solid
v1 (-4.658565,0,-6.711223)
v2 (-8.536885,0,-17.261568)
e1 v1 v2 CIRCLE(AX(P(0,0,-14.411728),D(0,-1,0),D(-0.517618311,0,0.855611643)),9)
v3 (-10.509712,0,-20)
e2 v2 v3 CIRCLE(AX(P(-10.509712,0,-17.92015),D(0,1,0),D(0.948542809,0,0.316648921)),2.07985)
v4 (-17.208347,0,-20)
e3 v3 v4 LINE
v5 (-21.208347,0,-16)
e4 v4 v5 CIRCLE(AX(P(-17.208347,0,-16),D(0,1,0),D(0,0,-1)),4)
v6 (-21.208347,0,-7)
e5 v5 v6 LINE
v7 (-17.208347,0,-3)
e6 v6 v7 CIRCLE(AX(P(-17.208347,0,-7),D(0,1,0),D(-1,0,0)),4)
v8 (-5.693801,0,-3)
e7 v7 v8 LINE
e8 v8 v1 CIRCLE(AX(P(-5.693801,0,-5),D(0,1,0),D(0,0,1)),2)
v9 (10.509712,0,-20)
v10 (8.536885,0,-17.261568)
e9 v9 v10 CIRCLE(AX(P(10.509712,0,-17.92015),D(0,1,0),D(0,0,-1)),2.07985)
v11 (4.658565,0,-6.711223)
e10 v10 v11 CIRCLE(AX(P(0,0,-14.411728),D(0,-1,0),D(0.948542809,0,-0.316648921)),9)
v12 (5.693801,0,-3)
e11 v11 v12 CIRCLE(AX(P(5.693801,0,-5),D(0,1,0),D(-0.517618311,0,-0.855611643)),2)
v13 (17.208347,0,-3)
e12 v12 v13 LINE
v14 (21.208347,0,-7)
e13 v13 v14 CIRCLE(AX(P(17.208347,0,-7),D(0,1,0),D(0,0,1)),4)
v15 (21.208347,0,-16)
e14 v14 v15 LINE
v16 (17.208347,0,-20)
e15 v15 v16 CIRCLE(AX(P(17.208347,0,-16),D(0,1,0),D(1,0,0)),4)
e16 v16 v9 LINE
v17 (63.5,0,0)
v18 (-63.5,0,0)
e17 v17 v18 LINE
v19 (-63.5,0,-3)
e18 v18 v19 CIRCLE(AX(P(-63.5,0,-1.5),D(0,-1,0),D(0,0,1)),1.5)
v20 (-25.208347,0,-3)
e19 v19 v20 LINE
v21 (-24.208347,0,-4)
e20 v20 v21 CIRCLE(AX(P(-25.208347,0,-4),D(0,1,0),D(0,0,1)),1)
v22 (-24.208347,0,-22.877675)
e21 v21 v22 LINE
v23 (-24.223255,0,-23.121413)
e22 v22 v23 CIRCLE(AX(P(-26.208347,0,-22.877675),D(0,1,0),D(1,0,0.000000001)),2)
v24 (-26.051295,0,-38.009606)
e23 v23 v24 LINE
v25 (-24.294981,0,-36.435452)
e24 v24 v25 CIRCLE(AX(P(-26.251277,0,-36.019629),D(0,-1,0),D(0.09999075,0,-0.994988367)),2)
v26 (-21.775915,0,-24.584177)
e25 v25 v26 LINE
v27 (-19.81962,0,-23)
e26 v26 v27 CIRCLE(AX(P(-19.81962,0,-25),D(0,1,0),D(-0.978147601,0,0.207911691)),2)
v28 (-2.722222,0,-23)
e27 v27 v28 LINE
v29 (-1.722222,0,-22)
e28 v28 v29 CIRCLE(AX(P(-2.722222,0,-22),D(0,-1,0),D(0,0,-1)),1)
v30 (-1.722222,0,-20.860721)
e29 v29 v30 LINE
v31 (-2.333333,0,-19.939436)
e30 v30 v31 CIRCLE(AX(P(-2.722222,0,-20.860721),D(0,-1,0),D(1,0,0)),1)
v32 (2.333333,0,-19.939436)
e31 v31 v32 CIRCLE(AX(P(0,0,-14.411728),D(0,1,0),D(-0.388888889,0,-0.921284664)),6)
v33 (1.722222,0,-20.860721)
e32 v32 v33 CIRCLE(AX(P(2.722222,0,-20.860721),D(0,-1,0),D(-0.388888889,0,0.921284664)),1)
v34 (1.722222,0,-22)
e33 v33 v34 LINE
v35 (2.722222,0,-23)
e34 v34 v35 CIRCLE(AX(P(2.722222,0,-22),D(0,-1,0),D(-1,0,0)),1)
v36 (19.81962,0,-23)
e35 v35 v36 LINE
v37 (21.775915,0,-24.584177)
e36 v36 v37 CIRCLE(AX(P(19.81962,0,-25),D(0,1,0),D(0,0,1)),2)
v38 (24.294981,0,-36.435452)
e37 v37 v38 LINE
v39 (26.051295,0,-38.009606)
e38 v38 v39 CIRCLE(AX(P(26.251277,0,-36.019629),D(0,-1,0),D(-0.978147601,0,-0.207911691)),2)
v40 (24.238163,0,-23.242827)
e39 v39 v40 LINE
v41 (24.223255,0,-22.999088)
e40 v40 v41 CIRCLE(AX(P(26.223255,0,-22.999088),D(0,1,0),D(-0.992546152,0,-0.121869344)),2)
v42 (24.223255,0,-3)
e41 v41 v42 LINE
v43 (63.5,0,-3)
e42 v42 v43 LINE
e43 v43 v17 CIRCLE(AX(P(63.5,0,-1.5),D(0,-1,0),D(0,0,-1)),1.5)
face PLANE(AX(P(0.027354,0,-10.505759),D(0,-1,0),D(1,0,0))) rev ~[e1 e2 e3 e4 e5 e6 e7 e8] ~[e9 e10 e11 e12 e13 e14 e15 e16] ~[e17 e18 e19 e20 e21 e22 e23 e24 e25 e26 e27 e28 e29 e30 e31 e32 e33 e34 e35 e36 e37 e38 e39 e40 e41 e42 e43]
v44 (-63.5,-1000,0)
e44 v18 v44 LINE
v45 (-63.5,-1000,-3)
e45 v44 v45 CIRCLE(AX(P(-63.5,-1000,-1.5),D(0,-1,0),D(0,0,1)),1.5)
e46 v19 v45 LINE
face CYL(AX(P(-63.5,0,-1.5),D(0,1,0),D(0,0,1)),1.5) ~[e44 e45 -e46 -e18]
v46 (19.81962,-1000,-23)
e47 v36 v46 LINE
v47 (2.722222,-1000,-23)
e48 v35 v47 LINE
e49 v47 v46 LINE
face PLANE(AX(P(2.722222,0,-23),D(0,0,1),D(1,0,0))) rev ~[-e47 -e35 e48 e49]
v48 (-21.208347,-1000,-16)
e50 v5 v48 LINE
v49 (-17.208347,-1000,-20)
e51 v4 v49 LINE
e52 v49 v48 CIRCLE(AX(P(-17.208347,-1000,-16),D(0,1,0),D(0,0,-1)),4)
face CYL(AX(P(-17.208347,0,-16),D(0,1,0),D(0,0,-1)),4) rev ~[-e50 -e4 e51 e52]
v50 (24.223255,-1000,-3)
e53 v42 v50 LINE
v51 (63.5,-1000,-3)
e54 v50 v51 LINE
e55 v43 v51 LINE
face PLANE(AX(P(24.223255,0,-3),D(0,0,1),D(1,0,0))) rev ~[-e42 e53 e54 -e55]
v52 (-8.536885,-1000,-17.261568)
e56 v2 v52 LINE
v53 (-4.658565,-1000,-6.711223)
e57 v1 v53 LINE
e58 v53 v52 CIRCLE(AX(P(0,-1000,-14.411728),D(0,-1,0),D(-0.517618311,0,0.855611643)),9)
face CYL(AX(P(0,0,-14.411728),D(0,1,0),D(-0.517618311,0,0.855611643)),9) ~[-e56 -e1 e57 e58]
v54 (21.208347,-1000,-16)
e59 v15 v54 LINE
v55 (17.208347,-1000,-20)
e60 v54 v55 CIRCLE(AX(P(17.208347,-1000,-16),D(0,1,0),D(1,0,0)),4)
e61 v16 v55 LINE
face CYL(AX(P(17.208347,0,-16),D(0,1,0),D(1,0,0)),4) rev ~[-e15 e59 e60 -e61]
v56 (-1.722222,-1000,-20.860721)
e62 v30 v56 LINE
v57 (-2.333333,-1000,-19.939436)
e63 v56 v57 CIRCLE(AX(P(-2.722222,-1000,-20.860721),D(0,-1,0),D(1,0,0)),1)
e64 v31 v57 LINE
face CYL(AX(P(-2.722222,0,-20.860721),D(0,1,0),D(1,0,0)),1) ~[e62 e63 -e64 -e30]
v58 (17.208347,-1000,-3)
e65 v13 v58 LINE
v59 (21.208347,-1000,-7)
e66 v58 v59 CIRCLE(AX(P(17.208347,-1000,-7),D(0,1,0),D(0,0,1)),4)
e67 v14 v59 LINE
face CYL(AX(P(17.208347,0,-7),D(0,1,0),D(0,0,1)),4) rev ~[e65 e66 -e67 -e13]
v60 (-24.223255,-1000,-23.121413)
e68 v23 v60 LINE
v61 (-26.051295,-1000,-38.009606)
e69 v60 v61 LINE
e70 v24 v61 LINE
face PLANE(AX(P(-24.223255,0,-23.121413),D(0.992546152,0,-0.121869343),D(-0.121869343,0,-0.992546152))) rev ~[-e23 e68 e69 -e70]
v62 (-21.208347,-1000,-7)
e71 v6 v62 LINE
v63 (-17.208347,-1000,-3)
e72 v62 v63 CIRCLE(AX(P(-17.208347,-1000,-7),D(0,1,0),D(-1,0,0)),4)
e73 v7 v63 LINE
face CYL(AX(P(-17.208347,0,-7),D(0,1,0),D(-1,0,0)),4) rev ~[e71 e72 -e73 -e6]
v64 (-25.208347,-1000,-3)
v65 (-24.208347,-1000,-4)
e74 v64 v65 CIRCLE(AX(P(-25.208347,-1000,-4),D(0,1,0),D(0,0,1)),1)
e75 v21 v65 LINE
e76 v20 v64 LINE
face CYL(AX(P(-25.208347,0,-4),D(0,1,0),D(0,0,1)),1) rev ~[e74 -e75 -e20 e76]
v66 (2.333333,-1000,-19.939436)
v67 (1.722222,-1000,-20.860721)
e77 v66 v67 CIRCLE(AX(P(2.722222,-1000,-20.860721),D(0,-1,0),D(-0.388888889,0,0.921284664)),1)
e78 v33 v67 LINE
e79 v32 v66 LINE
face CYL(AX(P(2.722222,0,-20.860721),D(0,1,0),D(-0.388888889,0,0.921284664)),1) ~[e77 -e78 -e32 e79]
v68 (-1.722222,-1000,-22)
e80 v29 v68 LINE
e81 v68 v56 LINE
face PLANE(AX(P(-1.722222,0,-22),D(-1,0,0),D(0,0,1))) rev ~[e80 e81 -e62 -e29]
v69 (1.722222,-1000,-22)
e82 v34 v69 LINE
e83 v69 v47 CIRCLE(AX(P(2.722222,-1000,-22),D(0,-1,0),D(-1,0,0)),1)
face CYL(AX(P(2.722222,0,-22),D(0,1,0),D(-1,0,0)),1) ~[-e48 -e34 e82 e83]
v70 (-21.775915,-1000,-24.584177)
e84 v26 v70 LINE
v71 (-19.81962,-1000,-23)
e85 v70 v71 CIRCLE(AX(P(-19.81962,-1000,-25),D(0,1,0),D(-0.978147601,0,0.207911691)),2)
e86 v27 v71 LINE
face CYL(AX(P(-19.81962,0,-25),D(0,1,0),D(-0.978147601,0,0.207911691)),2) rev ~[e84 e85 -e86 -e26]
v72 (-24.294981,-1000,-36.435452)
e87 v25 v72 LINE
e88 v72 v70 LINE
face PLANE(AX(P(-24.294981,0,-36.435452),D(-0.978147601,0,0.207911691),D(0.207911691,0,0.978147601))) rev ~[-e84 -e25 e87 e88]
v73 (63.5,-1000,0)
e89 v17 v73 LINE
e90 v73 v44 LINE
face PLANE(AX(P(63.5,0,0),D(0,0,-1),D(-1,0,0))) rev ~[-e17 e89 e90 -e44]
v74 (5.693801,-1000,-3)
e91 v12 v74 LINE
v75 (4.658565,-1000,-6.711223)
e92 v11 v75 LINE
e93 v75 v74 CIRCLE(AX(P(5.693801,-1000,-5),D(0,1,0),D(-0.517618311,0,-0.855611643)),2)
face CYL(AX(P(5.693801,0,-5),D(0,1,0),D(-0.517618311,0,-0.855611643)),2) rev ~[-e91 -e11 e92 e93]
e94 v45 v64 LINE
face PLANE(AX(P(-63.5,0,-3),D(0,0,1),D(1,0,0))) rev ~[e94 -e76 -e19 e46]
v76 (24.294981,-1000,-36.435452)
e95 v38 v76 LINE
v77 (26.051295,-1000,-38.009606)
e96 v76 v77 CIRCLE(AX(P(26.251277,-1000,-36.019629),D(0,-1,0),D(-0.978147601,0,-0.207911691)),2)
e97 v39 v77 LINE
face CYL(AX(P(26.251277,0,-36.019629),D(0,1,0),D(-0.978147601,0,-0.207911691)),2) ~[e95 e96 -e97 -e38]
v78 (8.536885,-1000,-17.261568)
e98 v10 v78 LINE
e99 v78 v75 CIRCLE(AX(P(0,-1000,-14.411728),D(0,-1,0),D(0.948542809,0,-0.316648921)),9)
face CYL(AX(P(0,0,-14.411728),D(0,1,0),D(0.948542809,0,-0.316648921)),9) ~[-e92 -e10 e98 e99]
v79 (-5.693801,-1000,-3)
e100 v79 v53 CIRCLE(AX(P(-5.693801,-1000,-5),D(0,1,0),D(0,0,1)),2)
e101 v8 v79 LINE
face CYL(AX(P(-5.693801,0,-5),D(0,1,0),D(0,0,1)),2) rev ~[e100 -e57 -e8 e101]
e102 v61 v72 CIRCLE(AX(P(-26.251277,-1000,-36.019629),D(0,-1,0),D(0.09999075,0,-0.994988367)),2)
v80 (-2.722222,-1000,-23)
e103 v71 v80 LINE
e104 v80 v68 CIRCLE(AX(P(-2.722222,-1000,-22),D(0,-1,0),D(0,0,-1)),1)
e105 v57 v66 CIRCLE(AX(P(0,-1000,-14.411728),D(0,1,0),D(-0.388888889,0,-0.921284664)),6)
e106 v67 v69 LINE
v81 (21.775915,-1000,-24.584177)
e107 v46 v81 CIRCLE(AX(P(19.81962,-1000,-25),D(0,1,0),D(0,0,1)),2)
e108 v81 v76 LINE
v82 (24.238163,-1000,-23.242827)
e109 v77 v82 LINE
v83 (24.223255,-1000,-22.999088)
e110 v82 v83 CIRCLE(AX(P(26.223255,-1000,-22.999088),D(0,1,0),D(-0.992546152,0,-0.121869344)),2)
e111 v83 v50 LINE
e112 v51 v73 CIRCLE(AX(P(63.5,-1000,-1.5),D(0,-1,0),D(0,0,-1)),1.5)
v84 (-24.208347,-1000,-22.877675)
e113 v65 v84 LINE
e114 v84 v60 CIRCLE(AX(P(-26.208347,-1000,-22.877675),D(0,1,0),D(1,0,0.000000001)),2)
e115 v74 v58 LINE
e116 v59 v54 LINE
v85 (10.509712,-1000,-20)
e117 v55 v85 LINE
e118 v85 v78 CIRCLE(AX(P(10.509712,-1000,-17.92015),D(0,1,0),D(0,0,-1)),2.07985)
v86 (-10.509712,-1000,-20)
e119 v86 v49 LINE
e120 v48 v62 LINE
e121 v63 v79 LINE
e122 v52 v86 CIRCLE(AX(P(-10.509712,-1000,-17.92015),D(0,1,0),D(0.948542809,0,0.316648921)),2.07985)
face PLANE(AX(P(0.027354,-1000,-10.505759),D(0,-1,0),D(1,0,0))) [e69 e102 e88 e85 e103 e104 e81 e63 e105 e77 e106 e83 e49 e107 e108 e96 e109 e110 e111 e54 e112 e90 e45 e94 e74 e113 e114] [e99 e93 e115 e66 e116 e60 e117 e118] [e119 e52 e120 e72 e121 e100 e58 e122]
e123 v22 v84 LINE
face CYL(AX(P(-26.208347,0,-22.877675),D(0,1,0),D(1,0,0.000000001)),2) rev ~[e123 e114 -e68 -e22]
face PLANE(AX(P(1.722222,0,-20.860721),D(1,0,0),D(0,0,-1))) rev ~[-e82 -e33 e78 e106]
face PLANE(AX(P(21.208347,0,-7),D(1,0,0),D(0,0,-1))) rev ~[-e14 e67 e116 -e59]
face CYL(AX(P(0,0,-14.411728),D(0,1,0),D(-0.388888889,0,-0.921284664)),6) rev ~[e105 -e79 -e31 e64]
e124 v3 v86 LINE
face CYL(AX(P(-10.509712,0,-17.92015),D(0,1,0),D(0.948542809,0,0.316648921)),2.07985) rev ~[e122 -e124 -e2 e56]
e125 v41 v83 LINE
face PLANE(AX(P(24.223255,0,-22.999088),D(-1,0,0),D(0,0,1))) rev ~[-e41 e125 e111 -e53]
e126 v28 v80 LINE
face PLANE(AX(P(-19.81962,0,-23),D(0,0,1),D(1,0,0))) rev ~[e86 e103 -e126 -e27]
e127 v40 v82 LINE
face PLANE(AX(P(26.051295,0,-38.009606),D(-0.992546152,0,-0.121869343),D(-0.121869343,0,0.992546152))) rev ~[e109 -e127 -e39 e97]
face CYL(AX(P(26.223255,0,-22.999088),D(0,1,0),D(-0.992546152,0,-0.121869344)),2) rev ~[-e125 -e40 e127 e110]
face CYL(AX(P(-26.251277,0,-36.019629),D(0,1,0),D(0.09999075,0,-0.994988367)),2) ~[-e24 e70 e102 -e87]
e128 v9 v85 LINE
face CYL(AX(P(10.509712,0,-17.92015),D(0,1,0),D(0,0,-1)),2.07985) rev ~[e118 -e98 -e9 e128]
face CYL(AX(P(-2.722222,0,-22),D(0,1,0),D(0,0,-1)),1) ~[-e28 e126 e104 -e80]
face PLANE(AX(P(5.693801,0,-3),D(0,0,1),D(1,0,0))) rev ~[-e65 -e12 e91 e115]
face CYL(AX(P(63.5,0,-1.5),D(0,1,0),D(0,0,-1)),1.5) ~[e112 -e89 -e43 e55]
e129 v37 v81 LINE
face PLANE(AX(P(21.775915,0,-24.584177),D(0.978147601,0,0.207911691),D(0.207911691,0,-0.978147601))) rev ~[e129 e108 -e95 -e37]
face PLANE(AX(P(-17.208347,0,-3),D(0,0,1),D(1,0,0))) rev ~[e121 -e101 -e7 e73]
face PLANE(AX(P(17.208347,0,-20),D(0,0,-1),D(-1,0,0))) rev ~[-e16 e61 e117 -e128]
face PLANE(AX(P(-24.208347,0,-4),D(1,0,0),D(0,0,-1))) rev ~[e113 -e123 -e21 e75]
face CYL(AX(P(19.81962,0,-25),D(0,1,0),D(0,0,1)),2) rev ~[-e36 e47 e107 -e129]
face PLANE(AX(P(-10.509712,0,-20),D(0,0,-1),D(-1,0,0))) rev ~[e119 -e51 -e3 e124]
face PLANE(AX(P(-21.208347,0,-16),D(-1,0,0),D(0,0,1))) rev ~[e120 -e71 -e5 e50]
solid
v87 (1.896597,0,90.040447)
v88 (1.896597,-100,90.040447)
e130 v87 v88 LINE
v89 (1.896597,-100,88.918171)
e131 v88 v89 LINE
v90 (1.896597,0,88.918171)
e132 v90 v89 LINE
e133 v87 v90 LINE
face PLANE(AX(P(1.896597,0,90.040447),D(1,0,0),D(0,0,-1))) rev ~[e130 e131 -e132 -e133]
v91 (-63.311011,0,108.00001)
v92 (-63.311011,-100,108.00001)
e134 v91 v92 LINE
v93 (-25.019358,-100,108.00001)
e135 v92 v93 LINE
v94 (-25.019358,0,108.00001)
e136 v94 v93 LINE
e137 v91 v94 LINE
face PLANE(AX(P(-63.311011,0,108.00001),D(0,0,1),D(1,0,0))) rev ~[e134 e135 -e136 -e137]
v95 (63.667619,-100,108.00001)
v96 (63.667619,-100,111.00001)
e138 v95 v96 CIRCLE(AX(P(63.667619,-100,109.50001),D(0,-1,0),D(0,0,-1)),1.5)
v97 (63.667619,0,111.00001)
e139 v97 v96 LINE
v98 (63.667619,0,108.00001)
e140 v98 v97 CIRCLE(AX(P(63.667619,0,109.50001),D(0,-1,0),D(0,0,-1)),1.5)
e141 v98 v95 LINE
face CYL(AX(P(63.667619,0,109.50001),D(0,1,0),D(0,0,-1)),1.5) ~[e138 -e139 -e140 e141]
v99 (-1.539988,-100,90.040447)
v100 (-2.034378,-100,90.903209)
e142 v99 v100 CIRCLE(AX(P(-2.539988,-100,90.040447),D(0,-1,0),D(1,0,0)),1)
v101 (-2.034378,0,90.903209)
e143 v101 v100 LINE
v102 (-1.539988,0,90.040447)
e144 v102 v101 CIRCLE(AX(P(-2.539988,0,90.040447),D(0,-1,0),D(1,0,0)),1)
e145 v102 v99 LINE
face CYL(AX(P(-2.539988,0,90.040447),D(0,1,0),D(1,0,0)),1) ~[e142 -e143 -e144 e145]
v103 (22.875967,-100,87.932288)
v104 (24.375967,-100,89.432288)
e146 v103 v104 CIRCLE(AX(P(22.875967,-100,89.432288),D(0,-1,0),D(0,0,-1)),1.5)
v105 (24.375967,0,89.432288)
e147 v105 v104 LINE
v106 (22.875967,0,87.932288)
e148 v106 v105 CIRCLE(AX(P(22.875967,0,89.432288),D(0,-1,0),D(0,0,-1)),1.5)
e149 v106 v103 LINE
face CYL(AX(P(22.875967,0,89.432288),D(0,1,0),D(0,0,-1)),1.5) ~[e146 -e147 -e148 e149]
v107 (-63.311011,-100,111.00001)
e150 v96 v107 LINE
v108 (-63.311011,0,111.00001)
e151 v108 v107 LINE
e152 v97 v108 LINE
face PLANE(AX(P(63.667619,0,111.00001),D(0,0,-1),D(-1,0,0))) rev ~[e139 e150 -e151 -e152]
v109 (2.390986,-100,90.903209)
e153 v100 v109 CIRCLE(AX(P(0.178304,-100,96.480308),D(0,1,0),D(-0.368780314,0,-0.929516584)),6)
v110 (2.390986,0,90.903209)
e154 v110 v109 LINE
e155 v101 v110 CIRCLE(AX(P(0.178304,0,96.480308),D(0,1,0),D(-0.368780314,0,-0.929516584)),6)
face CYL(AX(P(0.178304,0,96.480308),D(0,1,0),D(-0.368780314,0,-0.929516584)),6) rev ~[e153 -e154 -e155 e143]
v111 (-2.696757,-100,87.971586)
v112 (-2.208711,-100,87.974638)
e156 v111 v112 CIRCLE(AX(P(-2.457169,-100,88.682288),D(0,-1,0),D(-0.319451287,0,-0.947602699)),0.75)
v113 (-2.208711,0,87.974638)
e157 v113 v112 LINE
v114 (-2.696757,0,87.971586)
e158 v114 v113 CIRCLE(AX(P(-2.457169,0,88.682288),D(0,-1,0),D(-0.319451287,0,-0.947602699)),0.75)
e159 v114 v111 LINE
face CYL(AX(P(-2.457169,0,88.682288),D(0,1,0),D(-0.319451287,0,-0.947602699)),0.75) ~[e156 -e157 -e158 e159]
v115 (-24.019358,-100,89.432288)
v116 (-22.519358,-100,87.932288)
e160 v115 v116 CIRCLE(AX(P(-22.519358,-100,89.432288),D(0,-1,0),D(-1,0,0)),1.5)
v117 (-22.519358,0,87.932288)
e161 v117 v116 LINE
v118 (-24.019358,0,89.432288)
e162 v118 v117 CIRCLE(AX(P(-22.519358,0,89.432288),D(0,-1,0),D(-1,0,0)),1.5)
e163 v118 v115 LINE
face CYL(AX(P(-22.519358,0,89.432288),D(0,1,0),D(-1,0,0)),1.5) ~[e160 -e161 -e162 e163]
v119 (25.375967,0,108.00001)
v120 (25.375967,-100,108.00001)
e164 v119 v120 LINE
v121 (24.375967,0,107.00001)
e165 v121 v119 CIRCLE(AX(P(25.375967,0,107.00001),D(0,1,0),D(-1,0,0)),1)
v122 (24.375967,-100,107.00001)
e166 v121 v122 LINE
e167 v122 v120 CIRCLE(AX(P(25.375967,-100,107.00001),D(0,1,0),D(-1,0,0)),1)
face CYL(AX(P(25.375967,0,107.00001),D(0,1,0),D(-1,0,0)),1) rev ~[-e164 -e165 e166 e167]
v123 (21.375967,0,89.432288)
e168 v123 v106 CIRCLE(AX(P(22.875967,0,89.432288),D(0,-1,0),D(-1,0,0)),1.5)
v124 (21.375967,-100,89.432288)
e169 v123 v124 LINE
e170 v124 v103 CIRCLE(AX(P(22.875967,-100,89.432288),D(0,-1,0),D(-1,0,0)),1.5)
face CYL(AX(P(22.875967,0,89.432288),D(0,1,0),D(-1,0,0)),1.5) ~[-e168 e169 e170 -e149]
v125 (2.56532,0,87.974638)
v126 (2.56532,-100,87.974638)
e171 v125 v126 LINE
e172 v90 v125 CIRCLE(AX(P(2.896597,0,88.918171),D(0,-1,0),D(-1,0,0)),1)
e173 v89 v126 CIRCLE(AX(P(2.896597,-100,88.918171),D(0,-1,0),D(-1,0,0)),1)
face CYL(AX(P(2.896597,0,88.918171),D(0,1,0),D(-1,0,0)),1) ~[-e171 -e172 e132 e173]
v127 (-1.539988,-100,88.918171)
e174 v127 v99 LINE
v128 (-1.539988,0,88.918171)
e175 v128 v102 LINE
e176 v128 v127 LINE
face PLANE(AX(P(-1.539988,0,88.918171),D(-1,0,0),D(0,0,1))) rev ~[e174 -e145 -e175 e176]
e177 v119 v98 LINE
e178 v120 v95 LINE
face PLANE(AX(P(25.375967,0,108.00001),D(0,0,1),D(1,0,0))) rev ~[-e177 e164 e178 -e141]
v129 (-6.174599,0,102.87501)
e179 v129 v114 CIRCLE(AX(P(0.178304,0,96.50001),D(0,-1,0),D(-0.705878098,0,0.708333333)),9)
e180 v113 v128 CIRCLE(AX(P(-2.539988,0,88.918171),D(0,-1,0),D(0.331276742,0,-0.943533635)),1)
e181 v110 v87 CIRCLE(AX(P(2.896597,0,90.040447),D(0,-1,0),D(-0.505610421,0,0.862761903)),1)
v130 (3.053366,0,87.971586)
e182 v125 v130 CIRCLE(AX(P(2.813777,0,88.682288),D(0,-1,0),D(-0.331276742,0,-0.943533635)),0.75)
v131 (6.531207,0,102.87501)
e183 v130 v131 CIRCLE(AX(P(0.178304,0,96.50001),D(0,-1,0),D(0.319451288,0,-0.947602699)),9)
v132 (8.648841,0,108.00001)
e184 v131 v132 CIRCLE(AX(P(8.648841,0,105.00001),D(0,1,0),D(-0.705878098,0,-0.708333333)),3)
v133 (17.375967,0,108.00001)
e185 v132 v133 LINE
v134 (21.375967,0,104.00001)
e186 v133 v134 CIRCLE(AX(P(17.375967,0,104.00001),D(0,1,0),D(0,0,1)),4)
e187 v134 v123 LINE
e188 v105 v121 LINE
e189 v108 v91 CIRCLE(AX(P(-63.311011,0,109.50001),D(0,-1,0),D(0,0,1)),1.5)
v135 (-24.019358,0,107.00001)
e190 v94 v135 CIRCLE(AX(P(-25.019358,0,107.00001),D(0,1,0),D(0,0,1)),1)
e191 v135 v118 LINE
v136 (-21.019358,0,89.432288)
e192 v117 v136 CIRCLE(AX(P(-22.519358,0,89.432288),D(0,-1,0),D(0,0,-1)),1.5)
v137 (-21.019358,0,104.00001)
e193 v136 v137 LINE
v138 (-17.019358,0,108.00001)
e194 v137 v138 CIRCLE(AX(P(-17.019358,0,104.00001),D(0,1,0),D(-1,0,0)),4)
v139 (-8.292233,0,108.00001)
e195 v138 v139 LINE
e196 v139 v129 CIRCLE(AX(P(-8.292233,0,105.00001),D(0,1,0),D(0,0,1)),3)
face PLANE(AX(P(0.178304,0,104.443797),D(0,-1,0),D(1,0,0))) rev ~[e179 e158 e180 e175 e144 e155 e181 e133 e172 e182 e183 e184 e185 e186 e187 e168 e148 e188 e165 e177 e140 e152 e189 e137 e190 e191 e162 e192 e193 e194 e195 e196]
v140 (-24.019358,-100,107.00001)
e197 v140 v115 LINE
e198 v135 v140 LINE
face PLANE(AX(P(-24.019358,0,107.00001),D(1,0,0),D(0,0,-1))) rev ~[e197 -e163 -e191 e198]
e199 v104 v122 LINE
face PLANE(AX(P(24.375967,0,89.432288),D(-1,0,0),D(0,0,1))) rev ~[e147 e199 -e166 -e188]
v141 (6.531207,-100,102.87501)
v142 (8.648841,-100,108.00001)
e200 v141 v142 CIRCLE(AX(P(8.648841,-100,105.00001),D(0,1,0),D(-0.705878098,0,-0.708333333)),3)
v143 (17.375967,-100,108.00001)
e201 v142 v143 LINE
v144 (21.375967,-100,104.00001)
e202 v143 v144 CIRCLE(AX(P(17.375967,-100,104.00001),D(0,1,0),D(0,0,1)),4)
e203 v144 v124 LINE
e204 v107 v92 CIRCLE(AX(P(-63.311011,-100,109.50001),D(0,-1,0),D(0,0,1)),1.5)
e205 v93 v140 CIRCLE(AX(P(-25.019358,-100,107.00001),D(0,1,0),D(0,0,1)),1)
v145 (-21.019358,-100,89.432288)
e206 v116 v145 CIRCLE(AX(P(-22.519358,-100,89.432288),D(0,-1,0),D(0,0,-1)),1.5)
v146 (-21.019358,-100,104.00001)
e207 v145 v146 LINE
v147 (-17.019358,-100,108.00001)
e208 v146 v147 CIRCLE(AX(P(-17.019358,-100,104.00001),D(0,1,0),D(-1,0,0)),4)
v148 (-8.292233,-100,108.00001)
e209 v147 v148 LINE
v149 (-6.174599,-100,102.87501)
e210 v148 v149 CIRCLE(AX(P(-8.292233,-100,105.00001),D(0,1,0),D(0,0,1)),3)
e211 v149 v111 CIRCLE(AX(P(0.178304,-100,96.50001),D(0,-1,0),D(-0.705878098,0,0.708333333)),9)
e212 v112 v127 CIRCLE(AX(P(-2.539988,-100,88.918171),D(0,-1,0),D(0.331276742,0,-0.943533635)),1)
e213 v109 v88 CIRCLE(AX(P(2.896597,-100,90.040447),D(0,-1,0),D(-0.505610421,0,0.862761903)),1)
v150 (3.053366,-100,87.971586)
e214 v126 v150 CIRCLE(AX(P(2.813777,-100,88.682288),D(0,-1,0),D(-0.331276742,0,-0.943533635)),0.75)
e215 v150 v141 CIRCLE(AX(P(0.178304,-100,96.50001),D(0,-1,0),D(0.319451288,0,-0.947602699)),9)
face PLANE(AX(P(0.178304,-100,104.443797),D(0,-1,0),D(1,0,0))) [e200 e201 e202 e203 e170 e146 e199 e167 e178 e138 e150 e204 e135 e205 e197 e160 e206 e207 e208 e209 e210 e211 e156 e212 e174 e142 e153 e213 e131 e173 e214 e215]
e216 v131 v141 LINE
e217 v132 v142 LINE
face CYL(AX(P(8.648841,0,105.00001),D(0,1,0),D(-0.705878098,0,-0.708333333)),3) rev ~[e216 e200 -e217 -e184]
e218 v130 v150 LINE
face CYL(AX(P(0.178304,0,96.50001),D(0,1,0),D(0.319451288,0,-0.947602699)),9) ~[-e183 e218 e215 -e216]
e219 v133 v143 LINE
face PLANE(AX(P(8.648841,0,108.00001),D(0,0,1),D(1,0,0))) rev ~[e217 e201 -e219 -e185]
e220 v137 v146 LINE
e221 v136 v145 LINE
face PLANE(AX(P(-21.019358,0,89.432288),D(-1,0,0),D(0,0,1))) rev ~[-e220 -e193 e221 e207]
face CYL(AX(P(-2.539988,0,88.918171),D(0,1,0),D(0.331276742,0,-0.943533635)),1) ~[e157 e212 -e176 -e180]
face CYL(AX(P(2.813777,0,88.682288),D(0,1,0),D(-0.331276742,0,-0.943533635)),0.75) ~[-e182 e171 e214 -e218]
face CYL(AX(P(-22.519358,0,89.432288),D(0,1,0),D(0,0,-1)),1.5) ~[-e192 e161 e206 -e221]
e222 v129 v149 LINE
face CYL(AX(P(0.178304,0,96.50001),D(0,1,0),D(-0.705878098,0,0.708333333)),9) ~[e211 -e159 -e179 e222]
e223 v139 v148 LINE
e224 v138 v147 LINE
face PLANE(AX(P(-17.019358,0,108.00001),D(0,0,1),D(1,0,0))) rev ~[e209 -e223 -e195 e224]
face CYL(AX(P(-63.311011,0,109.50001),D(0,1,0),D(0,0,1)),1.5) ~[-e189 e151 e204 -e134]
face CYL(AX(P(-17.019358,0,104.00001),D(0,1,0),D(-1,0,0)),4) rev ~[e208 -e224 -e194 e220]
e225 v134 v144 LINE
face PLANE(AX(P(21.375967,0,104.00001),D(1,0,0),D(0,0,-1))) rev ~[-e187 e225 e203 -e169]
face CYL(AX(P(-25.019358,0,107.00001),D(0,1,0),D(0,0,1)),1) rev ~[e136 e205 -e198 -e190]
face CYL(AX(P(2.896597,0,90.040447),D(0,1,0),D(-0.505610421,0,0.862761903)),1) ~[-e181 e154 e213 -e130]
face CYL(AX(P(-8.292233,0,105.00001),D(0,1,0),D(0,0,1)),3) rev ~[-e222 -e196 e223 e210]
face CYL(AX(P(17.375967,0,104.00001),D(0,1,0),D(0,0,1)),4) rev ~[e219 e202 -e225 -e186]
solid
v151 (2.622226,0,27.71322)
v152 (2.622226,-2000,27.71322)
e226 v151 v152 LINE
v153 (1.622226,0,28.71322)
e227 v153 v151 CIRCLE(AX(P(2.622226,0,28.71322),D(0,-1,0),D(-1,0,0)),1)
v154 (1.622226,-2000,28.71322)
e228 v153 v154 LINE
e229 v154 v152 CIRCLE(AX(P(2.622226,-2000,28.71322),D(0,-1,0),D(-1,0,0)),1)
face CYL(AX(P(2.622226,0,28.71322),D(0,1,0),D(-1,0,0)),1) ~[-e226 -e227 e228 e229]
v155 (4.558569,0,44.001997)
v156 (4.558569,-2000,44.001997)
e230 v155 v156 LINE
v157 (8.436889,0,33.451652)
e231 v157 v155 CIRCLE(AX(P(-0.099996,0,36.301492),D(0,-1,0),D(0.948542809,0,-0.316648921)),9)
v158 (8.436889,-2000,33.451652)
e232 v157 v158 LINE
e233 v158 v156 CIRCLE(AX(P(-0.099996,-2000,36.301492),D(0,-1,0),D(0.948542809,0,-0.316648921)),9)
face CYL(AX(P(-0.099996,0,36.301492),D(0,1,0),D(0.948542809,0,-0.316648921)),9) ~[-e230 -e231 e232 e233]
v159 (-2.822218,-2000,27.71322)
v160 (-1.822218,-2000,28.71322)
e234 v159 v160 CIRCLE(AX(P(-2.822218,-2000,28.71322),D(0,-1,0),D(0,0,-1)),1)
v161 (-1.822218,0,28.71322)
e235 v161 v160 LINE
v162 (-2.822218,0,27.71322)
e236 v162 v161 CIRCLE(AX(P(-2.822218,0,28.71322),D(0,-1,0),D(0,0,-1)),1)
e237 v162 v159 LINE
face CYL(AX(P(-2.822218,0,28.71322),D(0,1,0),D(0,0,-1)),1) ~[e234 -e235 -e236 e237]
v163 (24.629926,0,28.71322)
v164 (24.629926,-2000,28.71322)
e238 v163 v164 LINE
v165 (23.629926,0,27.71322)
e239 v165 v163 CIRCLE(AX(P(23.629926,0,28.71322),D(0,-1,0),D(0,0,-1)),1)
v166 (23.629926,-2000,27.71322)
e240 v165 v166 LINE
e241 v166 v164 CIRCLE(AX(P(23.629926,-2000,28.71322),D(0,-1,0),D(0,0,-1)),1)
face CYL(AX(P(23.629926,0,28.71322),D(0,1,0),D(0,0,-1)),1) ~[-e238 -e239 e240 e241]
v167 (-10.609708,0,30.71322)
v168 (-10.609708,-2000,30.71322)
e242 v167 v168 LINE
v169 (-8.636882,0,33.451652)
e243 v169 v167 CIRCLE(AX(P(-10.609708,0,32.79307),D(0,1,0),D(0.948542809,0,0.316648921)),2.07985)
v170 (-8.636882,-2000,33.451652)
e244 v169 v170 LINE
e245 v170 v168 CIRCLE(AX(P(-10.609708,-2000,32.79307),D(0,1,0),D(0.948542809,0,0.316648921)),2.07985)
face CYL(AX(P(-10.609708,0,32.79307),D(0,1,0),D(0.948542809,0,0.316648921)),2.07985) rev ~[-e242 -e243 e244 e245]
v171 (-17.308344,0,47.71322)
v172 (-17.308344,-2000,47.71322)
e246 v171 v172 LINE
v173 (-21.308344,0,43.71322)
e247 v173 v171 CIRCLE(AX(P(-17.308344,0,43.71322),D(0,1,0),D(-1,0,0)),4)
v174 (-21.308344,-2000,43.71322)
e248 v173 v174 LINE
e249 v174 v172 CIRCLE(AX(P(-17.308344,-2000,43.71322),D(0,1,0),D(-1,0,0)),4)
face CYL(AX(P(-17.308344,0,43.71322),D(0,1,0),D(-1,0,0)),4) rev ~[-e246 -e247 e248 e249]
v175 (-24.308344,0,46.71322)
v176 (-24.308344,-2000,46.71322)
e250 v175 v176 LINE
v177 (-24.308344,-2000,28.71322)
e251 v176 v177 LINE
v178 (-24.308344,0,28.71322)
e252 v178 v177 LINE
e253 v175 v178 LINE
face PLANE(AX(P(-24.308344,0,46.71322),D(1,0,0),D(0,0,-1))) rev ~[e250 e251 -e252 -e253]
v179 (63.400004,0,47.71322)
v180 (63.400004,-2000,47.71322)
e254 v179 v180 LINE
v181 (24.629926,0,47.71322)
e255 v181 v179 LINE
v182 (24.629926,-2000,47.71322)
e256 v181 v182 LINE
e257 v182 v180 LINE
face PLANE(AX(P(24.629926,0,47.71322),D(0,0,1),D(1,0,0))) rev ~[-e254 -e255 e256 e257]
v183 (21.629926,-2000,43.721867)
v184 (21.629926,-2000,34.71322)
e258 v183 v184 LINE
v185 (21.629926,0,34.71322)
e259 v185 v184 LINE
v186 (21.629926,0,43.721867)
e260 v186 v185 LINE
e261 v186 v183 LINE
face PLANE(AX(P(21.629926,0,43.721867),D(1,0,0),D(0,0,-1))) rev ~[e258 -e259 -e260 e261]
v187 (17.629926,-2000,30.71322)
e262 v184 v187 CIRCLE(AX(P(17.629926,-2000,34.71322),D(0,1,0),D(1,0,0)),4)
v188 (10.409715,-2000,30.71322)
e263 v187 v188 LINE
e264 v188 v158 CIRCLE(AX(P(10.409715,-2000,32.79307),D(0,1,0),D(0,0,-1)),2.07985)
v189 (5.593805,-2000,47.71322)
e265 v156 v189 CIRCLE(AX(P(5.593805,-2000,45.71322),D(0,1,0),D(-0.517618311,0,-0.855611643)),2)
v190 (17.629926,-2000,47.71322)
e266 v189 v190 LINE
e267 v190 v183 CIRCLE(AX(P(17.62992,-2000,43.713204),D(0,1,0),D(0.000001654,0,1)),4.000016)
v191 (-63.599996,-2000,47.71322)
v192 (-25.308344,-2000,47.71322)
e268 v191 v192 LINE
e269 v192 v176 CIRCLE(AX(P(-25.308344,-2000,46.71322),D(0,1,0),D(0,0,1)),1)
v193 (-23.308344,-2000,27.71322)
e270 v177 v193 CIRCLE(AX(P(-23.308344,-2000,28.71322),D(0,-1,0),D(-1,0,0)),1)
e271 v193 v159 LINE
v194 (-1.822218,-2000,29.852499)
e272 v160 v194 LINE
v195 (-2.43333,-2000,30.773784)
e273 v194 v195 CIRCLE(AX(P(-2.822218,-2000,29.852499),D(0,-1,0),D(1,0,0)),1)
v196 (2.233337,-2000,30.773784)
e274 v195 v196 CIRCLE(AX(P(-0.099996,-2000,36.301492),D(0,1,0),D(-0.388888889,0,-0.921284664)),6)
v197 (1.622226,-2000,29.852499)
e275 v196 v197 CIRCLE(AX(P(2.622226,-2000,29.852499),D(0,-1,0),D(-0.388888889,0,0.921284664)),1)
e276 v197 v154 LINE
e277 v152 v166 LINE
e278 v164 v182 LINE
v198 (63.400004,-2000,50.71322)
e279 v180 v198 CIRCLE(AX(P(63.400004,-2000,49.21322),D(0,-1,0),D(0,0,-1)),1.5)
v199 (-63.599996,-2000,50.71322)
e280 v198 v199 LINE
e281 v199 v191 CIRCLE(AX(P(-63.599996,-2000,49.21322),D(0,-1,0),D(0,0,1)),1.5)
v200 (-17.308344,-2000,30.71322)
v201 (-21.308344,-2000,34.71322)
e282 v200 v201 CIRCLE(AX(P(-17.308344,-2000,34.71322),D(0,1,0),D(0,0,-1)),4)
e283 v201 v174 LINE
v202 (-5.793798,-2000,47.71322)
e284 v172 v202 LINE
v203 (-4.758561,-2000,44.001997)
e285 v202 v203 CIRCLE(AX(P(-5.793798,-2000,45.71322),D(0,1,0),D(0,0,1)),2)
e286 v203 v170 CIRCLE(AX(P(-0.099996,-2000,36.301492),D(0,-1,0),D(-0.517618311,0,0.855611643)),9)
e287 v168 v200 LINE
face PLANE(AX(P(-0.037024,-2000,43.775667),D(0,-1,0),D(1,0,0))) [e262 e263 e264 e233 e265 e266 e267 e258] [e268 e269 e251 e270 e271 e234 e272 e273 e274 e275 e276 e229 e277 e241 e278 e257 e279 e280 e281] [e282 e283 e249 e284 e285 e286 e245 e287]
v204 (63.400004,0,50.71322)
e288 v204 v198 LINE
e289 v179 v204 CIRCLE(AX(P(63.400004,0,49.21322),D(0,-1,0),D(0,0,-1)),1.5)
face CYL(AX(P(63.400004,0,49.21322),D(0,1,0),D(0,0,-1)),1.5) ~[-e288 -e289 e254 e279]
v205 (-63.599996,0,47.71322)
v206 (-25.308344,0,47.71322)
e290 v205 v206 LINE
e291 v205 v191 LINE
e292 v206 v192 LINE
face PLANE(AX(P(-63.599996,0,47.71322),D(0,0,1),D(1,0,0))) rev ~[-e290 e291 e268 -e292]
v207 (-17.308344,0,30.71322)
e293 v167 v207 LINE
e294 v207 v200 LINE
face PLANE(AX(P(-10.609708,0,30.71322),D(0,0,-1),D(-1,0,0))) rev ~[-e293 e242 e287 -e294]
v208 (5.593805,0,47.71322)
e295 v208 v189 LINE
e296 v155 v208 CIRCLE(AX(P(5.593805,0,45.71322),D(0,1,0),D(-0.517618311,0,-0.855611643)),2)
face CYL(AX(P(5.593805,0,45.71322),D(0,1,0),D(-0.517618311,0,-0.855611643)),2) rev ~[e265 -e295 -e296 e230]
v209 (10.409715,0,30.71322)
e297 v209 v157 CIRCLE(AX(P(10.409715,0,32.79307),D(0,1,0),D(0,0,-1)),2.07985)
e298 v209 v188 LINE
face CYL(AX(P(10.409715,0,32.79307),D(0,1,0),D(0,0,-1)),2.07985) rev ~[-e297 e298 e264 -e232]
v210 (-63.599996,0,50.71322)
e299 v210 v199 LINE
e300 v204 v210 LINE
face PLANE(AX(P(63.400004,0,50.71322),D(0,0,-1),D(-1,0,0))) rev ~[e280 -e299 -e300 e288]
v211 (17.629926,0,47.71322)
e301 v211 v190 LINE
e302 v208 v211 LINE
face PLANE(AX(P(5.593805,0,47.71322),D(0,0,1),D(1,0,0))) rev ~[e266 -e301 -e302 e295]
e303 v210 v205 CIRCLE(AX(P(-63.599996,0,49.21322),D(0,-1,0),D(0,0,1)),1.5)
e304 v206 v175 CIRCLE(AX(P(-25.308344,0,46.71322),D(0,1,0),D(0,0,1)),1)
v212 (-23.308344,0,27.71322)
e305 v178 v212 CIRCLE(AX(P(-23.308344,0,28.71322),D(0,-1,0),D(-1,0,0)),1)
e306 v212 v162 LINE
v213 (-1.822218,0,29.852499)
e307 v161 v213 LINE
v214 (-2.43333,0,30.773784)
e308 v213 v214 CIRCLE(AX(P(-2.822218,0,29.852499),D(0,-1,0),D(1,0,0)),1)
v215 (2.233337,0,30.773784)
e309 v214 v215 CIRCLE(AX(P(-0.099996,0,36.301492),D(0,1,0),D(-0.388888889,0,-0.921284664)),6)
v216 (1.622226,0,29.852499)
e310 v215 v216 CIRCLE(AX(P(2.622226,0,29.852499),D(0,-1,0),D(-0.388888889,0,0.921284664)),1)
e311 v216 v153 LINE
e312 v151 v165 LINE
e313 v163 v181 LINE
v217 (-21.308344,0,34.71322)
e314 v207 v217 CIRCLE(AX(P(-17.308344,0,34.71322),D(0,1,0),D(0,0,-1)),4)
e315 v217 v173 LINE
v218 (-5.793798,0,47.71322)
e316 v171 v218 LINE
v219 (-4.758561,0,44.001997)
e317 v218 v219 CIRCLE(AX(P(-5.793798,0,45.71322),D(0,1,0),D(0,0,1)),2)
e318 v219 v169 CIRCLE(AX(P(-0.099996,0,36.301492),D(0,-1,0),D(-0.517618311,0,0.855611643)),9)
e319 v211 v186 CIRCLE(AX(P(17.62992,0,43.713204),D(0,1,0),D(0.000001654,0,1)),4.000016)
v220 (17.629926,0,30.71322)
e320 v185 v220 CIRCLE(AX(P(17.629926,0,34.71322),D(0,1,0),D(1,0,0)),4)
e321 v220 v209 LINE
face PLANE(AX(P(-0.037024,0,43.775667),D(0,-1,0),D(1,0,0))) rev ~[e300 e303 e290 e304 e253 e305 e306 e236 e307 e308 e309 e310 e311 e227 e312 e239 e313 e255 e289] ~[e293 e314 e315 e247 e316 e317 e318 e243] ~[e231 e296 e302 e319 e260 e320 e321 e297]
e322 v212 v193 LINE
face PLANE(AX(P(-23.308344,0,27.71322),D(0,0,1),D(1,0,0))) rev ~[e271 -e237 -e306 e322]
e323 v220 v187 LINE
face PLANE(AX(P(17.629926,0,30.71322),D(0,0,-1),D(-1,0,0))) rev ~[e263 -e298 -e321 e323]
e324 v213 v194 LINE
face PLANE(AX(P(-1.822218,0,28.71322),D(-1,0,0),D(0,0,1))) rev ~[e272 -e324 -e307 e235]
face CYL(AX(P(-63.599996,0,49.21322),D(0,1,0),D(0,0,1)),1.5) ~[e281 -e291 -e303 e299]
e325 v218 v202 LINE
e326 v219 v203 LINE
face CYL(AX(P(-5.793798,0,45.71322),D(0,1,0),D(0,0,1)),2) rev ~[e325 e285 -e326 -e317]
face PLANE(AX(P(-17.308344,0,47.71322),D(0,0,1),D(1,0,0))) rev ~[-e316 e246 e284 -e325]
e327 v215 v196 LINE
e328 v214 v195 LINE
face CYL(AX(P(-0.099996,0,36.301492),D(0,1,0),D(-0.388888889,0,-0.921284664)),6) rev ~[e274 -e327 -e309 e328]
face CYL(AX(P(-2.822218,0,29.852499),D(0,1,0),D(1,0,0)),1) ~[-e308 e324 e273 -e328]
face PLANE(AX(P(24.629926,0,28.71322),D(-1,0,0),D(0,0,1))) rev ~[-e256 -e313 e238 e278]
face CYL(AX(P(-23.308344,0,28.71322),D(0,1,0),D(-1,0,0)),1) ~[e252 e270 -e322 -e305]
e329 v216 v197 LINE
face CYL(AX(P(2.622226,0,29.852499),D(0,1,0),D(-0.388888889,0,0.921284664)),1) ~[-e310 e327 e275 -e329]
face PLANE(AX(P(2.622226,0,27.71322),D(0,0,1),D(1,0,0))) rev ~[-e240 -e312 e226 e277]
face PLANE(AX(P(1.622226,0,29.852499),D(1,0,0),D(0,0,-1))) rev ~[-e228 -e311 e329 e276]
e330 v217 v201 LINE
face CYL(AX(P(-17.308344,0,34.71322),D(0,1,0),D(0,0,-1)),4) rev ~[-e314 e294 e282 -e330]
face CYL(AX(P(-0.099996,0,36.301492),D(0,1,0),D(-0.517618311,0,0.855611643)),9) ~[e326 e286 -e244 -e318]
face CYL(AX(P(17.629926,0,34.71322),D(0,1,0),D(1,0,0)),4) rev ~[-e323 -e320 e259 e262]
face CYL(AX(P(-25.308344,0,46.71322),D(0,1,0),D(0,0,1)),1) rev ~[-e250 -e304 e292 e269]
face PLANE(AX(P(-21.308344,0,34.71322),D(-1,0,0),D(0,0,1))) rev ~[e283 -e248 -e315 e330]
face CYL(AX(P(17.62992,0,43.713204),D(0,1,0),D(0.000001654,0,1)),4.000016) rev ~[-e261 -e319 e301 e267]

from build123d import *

# Parameters (mm, degrees)
F1_DEPTH = 1000
F2_DEPTH = 2000
F3_DEPTH = 100


# Not quite as in the source:
# - ends of sketch curves that miss each other by under 0.0002 mm in the source are joined


with BuildPart() as f1:
    # F0 (on Front) → F1 (new body)
    with BuildSketch(Plane.XZ):
        with BuildLine():
            Line((63.5, 0), (-63.5, 0))
            ThreePointArc((-63.5, 0), (-65, -1.5), (-63.5, -3))
            Line((-63.5, -3), (-25.2083473523, -3))
            ThreePointArc((-25.2083473523, -3), (-24.5012405711, -3.2928932188), (-24.2083473523, -4))
            Line((-24.2083473523, -4), (-24.2083473523, -22.8776747597))
            ThreePointArc((-24.2083473523, -22.8776747597), (-24.2120777554, -22.9997718388), (-24.223255049, -23.1214134465))
            Line((-24.223255049, -23.1214134465), (-26.0512952001, -38.0096057211))
            ThreePointArc((-26.0512952001, -38.0096057211), (-24.9164089173, -37.5089670967), (-24.2949814984, -36.4354523693))
            Line((-24.2949814984, -36.4354523693), (-21.7759150734, -24.5841766184))
            ThreePointArc((-21.7759150734, -24.5841766184), (-21.0782606541, -23.4457080771), (-19.819619872, -23))
            Line((-19.819619872, -23), (-2.7222222222, -23))
            ThreePointArc((-2.7222222222, -23), (-2.015115441, -22.7071067812), (-1.7222222222, -22))
            Line((-1.7222222222, -22), (-1.7222222222, -20.8607207227))
            ThreePointArc((-1.7222222222, -20.8607207227), (-1.8888888889, -20.3079499243), (-2.3333333333, -19.9394360587))
            ThreePointArc((-2.3333333333, -19.9394360587), (0, -8.4117280748), (2.3333333333, -19.9394360587))
            ThreePointArc((2.3333333333, -19.9394360587), (1.8888888889, -20.3079499243), (1.7222222222, -20.8607207227))
            Line((1.7222222222, -20.8607207227), (1.7222222222, -22))
            ThreePointArc((1.7222222222, -22), (2.015115441, -22.7071067812), (2.7222222222, -23))
            Line((2.7222222222, -23), (19.819619872, -23))
            ThreePointArc((19.819619872, -23), (21.0782606541, -23.4457080771), (21.7759150734, -24.5841766184))
            Line((21.7759150734, -24.5841766184), (24.2949814984, -36.4354523693))
            ThreePointArc((24.2949814984, -36.4354523693), (24.9164089173, -37.5089670967), (26.0512952001, -38.0096057211))
            Line((26.0512952001, -38.0096057211), (24.2381627457, -23.242826893))
            ThreePointArc((24.2381627457, -23.242826893), (24.2269854521, -23.1211852853), (24.223255049, -22.9990882062))
            Line((24.223255049, -22.9990882062), (24.223255049, -3))
            Line((24.223255049, -3), (63.5, -3))
            ThreePointArc((63.5, -3), (65, -1.5), (63.5, 0))
        make_face()
        with BuildLine():
            Line((-21.2083473523, -16), (-21.2083473523, -7))
            ThreePointArc((-21.2083473523, -7), (-20.036774477, -4.1715728753), (-17.2083473523, -3))
            Line((-17.2083473523, -3), (-5.6938014232, -3))
            ThreePointArc((-5.6938014232, -3), (-3.7673478716, -4.4626205124), (-4.6585648008, -6.7112232863))
            ThreePointArc((-4.6585648008, -6.7112232863), (-8.4473321852, -11.3064778509), (-8.5368852816, -17.2615683665))
            ThreePointArc((-8.5368852816, -17.2615683665), (-8.8221800029, -19.1358853065), (-10.5097115925, -20))
            Line((-10.5097115925, -20), (-17.2083473523, -20))
            ThreePointArc((-17.2083473523, -20), (-20.036774477, -18.8284271247), (-21.2083473523, -16))
        make_face(mode=Mode.SUBTRACT)
        with BuildLine():
            Line((21.2083473523, -7), (21.2083473523, -7.008646884))
            Line((21.2083473523, -7.008646884), (21.2083473523, -16))
            ThreePointArc((21.2083473523, -16), (20.036774477, -18.8284271247), (17.2083473523, -20))
            Line((17.2083473523, -20), (10.5097115925, -20))
            ThreePointArc((10.5097115925, -20), (8.8221800029, -19.1358853065), (8.5368852816, -17.2615683665))
            ThreePointArc((8.5368852816, -17.2615683665), (8.4473321852, -11.3064778509), (4.6585648008, -6.7112232863))
            ThreePointArc((4.6585648008, -6.7112232863), (3.7673478716, -4.4626205124), (5.6938014232, -3))
            Line((5.6938014232, -3), (17.2083473523, -3))
            ThreePointArc((17.2083473523, -3), (20.036774477, -4.1715728753), (21.2083473523, -7))
        make_face(mode=Mode.SUBTRACT)
    extrude(amount=F1_DEPTH)


with BuildPart() as f2:
    # F0 (on Front) → F2 (new body)
    with BuildSketch(Plane.XZ):
        with BuildLine():
            Line((63.4000037313, 50.7132201195), (-63.5999962687, 50.7132201195))
            ThreePointArc((-63.5999962687, 50.7132201195), (-65.0999962687, 49.2132201195), (-63.5999962687, 47.7132201195))
            Line((-63.5999962687, 47.7132201195), (-25.308343621, 47.7132201195))
            ThreePointArc((-25.308343621, 47.7132201195), (-24.6012368398, 47.4203269007), (-24.308343621, 46.7132201195))
            Line((-24.308343621, 46.7132201195), (-24.308343621, 28.7132201195))
            ThreePointArc((-24.308343621, 28.7132201195), (-24.0154504022, 28.0061133383), (-23.308343621, 27.7132201195))
            Line((-23.308343621, 27.7132201195), (-19.9187639256, 27.7132201195))
            Line((-19.9187639256, 27.7132201195), (-2.822218491, 27.7132201195))
            ThreePointArc((-2.822218491, 27.7132201195), (-2.1151117098, 28.0061133383), (-1.822218491, 28.7132201195))
            Line((-1.822218491, 28.7132201195), (-1.822218491, 29.8524993968))
            ThreePointArc((-1.822218491, 29.8524993968), (-1.9888851576, 30.4052701952), (-2.4333296021, 30.7737840608))
            ThreePointArc((-2.4333296021, 30.7737840608), (-0.0999962687, 42.3014920447), (2.2333370646, 30.7737840608))
            ThreePointArc((2.2333370646, 30.7737840608), (1.7888926201, 30.4052701952), (1.6222259535, 29.8524993968))
            Line((1.6222259535, 29.8524993968), (1.6222259535, 28.7132201195))
            ThreePointArc((1.6222259535, 28.7132201195), (1.9151191723, 28.0061133383), (2.6222259535, 27.7132201195))
            Line((2.6222259535, 27.7132201195), (19.7196236032, 27.7132201195))
            Line((19.7196236032, 27.7132201195), (23.629926187, 27.7132201195))
            ThreePointArc((23.629926187, 27.7132201195), (24.3370329682, 28.0061133383), (24.629926187, 28.7132201195))
            Line((24.629926187, 28.7132201195), (24.629926187, 47.7132201195))
            Line((24.629926187, 47.7132201195), (63.4000037313, 47.7132201195))
            ThreePointArc((63.4000037313, 47.7132201195), (64.9000037313, 49.2132201195), (63.4000037313, 50.7132201195))
        make_face()
        with BuildLine():
            Line((-21.308343621, 34.7132201195), (-21.308343621, 43.7132201195))
            ThreePointArc((-21.308343621, 43.7132201195), (-20.1367707458, 46.5416472442), (-17.308343621, 47.7132201195))
            Line((-17.308343621, 47.7132201195), (-5.7937976919, 47.7132201195))
            ThreePointArc((-5.7937976919, 47.7132201195), (-3.8673441404, 46.2505996071), (-4.7585610695, 44.0019968332))
            ThreePointArc((-4.7585610695, 44.0019968332), (-8.5473284539, 39.4067422686), (-8.6368815504, 33.451651753))
            ThreePointArc((-8.6368815504, 33.451651753), (-8.9221762716, 31.577334813), (-10.6097078613, 30.7132201195))
            Line((-10.6097078613, 30.7132201195), (-17.308343621, 30.7132201195))
            ThreePointArc((-17.308343621, 30.7132201195), (-20.1367707458, 31.8847929947), (-21.308343621, 34.7132201195))
        make_face(mode=Mode.SUBTRACT)
        with BuildLine():
            Line((21.629926187, 43.7218670034), (21.629926187, 43.7132201195))
            Line((21.629926187, 43.7132201195), (21.629926187, 34.7132201195))
            ThreePointArc((21.629926187, 34.7132201195), (20.4583533118, 31.8847929947), (17.629926187, 30.7132201195))
            Line((17.629926187, 30.7132201195), (17.1083510835, 30.7132201195))
            Line((17.1083510835, 30.7132201195), (10.4097153238, 30.7132201195))
            ThreePointArc((10.4097153238, 30.7132201195), (8.7221837341, 31.577334813), (8.4368890129, 33.451651753))
            ThreePointArc((8.4368890129, 33.451651753), (8.3473359164, 39.4067422686), (4.558568532, 44.0019968332))
            ThreePointArc((4.558568532, 44.0019968332), (3.6673516029, 46.2505996071), (5.5938051544, 47.7132201195))
            Line((5.5938051544, 47.7132201195), (6.115380258, 47.7132201195))
            Line((6.115380258, 47.7132201195), (17.629926187, 47.7132201195))
            ThreePointArc((17.629926187, 47.7132201195), (20.4552945298, 46.5447027218), (21.629926187, 43.7218670034))
        make_face(mode=Mode.SUBTRACT)
    extrude(amount=F2_DEPTH)


with BuildPart() as f3:
    # F0 (on Front) → F3 (new body)
    with BuildSketch(Plane.XZ):
        with BuildLine():
            Line((63.6676191584, 111.000010252), (-63.3110105991, 111.000010252))
            ThreePointArc((-63.3110105991, 111.000010252), (-64.8110105991, 109.500010252), (-63.3110105991, 108.000010252))
            Line((-63.3110105991, 108.000010252), (-25.0193579514, 108.000010252))
            ThreePointArc((-25.0193579514, 108.000010252), (-24.3122511702, 107.7071170332), (-24.0193579514, 107.000010252))
            Line((-24.0193579514, 107.000010252), (-24.0193579514, 89.4322879863))
            ThreePointArc((-24.0193579514, 89.4322879863), (-23.5800181232, 88.3716278145), (-22.5193579514, 87.9322879863))
            ThreePointArc((-22.5193579514, 87.9322879863), (-21.4586977796, 88.3716278145), (-21.0193579514, 89.4322879863))
            Line((-21.0193579514, 89.4322879863), (-21.0193579514, 104.000010252))
            ThreePointArc((-21.0193579514, 104.000010252), (-19.8477850761, 106.8284373767), (-17.0193579514, 108.000010252))
            Line((-17.0193579514, 108.000010252), (-8.2922328934, 108.000010252))
            ThreePointArc((-8.2922328934, 108.000010252), (-5.5195987668, 106.1456541757), (-6.1745986001, 102.875010252))
            ThreePointArc((-6.1745986001, 102.875010252), (-8.5862177235, 94.4547342177), (-2.6967573079, 87.9715859621))
            ThreePointArc((-2.6967573079, 87.9715859621), (-2.4524791129, 87.9323026488), (-2.2087112857, 87.9746377601))
            ThreePointArc((-2.2087112857, 87.9746377601), (-1.7241213898, 88.3399312814), (-1.5399880278, 88.918171395))
            Line((-1.5399880278, 88.918171395), (-1.5399880278, 90.0404468849))
            ThreePointArc((-1.5399880278, 90.0404468849), (-1.6723445466, 90.5376337608), (-2.0343776068, 90.9032087885))
            ThreePointArc((-2.0343776068, 90.9032087885), (0.1783042796, 102.4803082917), (2.3909861661, 90.9032087885))
            ThreePointArc((2.3909861661, 90.9032087885), (2.0289531059, 90.5376337608), (1.8965965871, 90.0404468849))
            Line((1.8965965871, 90.0404468849), (1.8965965871, 88.918171395))
            ThreePointArc((1.8965965871, 88.918171395), (2.080729949, 88.3399312814), (2.565319845, 87.9746377601))
            ThreePointArc((2.565319845, 87.9746377601), (2.8090876722, 87.9323026488), (3.0533658672, 87.9715859621))
            ThreePointArc((3.0533658672, 87.9715859621), (8.9428262828, 94.4547342177), (6.5312071594, 102.875010252))
            ThreePointArc((6.5312071594, 102.875010252), (5.8762073261, 106.1456541757), (8.6488414527, 108.000010252))
            Line((8.6488414527, 108.000010252), (17.3759665107, 108.000010252))
            ThreePointArc((17.3759665107, 108.000010252), (20.2043936354, 106.8284373767), (21.3759665107, 104.000010252))
            Line((21.3759665107, 104.000010252), (21.3759665107, 89.4322879863))
            ThreePointArc((21.3759665107, 89.4322879863), (21.8153063389, 88.3716278145), (22.8759665107, 87.9322879863))
            ThreePointArc((22.8759665107, 87.9322879863), (23.9366266825, 88.3716278145), (24.3759665107, 89.4322879863))
            Line((24.3759665107, 89.4322879863), (24.3759665107, 107.000010252))
            ThreePointArc((24.3759665107, 107.000010252), (24.6688597295, 107.7071170332), (25.3759665107, 108.000010252))
            Line((25.3759665107, 108.000010252), (63.6676191584, 108.000010252))
            ThreePointArc((63.6676191584, 108.000010252), (65.1676191584, 109.500010252), (63.6676191584, 111.000010252))
        make_face()
    extrude(amount=F3_DEPTH)


solid = Compound([f1.part, f2.part, f3.part])
